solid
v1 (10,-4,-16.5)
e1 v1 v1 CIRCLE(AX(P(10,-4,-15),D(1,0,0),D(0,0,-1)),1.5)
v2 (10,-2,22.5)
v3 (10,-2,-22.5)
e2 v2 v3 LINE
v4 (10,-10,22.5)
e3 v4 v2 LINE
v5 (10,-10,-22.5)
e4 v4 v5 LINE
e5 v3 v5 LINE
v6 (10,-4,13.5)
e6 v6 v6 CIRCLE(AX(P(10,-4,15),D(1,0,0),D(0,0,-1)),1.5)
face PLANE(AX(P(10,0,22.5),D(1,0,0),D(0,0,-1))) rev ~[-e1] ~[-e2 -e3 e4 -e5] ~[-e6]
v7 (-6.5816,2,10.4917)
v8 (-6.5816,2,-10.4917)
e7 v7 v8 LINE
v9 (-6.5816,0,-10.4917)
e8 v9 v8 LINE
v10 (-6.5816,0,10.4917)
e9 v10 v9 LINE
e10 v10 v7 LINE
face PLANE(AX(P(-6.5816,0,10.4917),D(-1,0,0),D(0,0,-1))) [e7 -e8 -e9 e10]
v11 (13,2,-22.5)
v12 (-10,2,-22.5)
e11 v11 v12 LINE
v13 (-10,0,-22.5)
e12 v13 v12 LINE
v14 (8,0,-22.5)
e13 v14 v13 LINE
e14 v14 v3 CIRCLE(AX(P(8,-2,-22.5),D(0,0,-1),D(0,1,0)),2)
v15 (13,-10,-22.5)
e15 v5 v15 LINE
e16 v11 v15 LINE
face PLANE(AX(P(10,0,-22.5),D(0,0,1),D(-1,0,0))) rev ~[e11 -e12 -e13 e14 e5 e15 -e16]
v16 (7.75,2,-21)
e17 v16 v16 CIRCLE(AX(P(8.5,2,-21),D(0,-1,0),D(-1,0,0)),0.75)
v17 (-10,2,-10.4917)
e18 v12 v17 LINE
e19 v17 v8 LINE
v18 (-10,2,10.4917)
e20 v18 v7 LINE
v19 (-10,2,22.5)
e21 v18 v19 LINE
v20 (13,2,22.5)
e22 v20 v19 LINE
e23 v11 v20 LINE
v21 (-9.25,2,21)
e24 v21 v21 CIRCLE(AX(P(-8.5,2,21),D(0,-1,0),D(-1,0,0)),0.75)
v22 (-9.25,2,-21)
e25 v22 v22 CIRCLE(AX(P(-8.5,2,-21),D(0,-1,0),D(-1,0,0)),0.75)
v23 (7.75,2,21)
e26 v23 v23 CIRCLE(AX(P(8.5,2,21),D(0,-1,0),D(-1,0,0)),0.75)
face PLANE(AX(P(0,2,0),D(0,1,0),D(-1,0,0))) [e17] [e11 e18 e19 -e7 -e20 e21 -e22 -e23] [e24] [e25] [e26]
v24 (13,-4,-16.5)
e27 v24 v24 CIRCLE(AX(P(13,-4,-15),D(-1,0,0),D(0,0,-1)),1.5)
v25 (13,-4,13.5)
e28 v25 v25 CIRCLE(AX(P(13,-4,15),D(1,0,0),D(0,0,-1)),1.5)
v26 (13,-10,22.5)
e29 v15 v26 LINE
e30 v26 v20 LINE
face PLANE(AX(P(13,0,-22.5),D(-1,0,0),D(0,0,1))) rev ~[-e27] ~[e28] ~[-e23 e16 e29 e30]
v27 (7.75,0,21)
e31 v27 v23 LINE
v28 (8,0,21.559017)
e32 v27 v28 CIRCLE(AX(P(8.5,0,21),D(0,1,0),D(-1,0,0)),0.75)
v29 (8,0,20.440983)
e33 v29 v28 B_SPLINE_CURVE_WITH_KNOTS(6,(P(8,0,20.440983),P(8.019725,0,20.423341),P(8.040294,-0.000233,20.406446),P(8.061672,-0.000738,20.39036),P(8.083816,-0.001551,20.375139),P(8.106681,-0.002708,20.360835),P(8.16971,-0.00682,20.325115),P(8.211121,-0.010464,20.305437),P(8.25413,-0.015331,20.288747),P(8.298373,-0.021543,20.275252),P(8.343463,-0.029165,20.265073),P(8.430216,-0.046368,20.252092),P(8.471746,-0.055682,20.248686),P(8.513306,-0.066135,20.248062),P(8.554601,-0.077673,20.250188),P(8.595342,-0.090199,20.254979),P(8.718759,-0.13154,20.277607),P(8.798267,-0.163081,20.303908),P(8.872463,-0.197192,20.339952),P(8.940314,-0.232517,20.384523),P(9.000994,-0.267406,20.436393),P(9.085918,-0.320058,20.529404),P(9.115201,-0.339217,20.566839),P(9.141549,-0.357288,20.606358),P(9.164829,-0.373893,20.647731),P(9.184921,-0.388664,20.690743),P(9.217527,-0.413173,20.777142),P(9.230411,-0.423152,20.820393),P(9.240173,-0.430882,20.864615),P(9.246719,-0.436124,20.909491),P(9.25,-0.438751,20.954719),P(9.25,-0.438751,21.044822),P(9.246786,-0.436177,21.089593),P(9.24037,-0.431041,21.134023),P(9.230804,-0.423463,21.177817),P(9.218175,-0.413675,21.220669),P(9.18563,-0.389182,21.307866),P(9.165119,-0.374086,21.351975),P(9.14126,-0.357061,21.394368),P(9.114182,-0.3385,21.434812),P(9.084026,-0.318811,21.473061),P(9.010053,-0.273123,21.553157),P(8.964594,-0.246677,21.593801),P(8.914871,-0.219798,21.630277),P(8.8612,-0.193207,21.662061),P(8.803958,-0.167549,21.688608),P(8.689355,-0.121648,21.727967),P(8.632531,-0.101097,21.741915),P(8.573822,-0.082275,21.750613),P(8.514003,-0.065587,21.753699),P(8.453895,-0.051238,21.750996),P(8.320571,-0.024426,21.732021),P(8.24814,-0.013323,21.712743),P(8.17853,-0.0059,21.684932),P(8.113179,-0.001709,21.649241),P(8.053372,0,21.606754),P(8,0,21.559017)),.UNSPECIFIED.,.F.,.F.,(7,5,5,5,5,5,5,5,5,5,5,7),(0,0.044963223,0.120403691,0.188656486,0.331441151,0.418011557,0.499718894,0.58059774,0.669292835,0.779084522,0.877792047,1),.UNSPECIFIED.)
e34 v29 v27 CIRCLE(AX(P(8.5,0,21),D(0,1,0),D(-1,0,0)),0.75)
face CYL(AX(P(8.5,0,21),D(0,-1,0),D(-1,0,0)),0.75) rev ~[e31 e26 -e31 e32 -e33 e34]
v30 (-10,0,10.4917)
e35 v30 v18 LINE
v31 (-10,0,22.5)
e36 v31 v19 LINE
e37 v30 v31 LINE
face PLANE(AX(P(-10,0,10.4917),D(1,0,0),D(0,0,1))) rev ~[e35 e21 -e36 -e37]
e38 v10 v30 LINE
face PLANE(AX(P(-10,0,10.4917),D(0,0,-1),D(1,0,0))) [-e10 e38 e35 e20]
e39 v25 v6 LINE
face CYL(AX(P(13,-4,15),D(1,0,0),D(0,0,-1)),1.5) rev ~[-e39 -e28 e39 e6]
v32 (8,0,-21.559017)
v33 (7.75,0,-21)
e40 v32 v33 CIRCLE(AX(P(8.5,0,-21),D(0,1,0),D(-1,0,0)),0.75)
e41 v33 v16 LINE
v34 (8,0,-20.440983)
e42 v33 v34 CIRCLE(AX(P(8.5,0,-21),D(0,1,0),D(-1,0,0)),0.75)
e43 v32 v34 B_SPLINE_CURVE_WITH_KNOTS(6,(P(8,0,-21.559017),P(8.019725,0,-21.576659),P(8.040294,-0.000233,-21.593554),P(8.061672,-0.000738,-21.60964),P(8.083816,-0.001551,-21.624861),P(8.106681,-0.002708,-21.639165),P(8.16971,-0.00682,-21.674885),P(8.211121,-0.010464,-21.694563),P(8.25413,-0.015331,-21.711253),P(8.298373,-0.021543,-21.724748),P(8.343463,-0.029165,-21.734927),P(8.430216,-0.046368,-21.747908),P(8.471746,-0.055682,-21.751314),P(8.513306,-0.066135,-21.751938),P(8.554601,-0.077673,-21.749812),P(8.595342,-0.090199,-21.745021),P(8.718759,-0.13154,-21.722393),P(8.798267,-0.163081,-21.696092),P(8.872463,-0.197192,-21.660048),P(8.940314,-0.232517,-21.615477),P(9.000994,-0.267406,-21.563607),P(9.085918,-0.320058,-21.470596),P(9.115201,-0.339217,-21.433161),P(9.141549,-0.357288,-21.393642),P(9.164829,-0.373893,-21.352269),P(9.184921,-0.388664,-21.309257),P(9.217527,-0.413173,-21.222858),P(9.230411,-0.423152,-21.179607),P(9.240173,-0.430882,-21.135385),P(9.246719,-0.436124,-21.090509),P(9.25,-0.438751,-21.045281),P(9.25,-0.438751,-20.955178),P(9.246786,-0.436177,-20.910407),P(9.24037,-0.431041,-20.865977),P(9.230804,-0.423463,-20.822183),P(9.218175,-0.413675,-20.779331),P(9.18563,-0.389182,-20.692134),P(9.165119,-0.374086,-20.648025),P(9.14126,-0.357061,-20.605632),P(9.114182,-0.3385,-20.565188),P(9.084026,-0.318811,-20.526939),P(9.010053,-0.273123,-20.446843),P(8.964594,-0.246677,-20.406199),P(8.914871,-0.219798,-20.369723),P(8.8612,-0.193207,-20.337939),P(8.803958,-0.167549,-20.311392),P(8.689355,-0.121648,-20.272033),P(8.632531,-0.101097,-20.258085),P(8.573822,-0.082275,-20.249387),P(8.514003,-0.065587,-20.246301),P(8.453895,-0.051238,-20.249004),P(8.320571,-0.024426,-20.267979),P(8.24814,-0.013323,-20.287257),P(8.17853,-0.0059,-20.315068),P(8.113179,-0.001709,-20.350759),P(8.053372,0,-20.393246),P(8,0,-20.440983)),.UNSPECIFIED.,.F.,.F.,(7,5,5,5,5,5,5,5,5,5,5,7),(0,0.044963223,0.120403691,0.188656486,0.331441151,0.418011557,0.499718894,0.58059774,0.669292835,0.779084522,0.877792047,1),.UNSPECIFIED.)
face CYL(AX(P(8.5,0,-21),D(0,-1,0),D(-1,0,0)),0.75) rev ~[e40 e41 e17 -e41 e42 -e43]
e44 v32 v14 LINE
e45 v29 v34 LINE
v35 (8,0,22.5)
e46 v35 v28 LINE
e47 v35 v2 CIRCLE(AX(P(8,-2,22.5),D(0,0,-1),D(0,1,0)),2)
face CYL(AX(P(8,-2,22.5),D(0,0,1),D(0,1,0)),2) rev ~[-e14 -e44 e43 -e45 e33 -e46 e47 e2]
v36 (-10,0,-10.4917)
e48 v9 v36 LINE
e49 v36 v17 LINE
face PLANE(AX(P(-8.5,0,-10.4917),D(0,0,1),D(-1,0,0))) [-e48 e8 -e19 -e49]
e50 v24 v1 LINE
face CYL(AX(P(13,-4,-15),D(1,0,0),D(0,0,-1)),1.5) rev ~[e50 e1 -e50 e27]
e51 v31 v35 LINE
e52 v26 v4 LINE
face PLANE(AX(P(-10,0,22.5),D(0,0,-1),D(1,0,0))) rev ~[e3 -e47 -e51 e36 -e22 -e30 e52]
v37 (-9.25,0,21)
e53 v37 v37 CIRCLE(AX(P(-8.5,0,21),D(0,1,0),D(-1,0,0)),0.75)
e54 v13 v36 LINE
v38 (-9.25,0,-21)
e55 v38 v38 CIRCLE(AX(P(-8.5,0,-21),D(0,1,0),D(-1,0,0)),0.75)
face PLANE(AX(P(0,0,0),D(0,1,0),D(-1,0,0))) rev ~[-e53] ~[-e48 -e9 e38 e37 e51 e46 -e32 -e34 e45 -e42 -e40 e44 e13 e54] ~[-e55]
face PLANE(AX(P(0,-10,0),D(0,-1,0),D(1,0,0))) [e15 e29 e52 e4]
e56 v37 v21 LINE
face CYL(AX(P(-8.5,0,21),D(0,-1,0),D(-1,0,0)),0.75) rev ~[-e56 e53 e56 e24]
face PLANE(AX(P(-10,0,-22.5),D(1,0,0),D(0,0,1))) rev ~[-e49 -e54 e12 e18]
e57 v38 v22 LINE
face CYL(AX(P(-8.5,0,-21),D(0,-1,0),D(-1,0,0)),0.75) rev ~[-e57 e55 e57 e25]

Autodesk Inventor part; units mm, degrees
ref_plane "YZ Plane" through (0, 0, 0) normal (1, 0, 0) x (0, 1, 0)
ref_plane "XZ Plane" through (0, 0, 0) normal (0, 1, 0) x (-1, 0, 0)
ref_plane "XY Plane" through (0, 0, 0) normal (0, 0, 1) x (1, 0, 0)
sketch "Sketch1" plane through (0, 0, 0) normal (0, 1, 0) x (-1, 0, 0)
  line L0 (10, 22.5) -> (-10, 22.5)
  line L1 (-10, 22.5) -> (-10, -22.5)
  line L2 (-10, -22.5) -> (10, -22.5)
  line L3 (10, -22.5) -> (10, 22.5)
  line L4 (10, 22.5) -> (-10, -22.5) construction
  line L5 (-10, 22.5) -> (10, -22.5) construction
  line L6 (13.4184, 10.4917) -> (6.5816, 10.4917)
  line L7 (6.5816, 10.4917) -> (6.5816, -10.4917)
  line L8 (6.5816, -10.4917) -> (13.4184, -10.4917)
  line L9 (13.4184, -10.4917) -> (13.4184, 10.4917)
  line L10 (13.4184, 10.4917) -> (6.5816, -10.4917) construction
  line L11 (6.5816, 10.4917) -> (13.4184, -10.4917) construction
  line L12 (8.5, 21) -> (-8.5, 21)
  line L13 (-8.5, 21) -> (-8.5, -21)
  line L14 (-8.5, -21) -> (8.5, -21)
  line L15 (8.5, -21) -> (8.5, 21)
  line L16 (8.5, 21) -> (-8.5, -21) construction
  line L17 (-8.5, 21) -> (8.5, -21) construction
  circle A0 centre (8.5, 21) radius 0.75
  circle A1 centre (8.5, -21) radius 0.75
  circle A2 centre (-8.5, -21) radius 0.75
  circle A3 centre (-8.5, 21) radius 0.75
  point P0 (0, 0)
  point P1 (10, 0)
  point P2 (10, 10.4917)
  point P3 (10, -10.4917)
  dimension "d0" = 20
  dimension "d1" = 45
  dimension "d2" = 17
  dimension "d3" = 42
  dimension "d4" = 1.5
  dimension "d5" = 1.5
  dimension "d6" = 1.5
  dimension "d7" = 1.5
extrude "Extrusion1" add sketch "Sketch1" along normal blind 2 contours L3 L6 L15 A0 L12 A3 L13 A2 L14 A1 L8 L2 L1 L0 | L6 L7 L8 L15 A1 L14 A2 L13 A3 L12 A0
sketch "Sketch2" plane through (0, 0, 0) normal (0, -1, 0) x (1, 0, 0)
  line L0 (10, -22.5) -> (-10, -22.5) projected
  line L1 (10, -22.5) -> (13, -22.5)
  line L2 (13, -22.5) -> (13, 22.5)
  line L3 (-10, 22.5) -> (10, 22.5) projected
  line L4 (13, 22.5) -> (10, 22.5)
  line L5 (10, 22.5) -> (10, -22.5)
  point P0 (0, 0)
  dimension "d10" = 3
  dimension "d11" = 45
extrude "Extrusion2" add sketch "Sketch2" along normal blind 10 and the other way blind 2
fillet "Fillet1" radius 2 1 edges at (10, 0, 0)
sketch "Sketch3" plane through (13, -10, 22.5) normal (1, 0, 0) x (0, 0, -1)
  line L0 (0, 0) -> (45, 0) projected
  line L1 (22.5, 0) -> (22.5, 5)
  line L2 (22.5, 5) -> (22.5, 6)
  line L3 (22.5, 6) -> (7.5, 6)
  line L4 (7.5, 6) -> (37.5, 6)
  circle A0 centre (37.5, 6) radius 1.5
  circle A1 centre (7.5, 6) radius 1.5
  point P0 (22.5, 10)
  dimension "d17" = 5
  dimension "d18" = 1
  dimension "d19" = 15
  dimension "d20" = 30
  dimension "d21" = 3
  dimension "d22" = 3
extrude "Extrusion3" cut sketch "Sketch3" against normal blind 10
properties part number "Ultrasonic_holder"
